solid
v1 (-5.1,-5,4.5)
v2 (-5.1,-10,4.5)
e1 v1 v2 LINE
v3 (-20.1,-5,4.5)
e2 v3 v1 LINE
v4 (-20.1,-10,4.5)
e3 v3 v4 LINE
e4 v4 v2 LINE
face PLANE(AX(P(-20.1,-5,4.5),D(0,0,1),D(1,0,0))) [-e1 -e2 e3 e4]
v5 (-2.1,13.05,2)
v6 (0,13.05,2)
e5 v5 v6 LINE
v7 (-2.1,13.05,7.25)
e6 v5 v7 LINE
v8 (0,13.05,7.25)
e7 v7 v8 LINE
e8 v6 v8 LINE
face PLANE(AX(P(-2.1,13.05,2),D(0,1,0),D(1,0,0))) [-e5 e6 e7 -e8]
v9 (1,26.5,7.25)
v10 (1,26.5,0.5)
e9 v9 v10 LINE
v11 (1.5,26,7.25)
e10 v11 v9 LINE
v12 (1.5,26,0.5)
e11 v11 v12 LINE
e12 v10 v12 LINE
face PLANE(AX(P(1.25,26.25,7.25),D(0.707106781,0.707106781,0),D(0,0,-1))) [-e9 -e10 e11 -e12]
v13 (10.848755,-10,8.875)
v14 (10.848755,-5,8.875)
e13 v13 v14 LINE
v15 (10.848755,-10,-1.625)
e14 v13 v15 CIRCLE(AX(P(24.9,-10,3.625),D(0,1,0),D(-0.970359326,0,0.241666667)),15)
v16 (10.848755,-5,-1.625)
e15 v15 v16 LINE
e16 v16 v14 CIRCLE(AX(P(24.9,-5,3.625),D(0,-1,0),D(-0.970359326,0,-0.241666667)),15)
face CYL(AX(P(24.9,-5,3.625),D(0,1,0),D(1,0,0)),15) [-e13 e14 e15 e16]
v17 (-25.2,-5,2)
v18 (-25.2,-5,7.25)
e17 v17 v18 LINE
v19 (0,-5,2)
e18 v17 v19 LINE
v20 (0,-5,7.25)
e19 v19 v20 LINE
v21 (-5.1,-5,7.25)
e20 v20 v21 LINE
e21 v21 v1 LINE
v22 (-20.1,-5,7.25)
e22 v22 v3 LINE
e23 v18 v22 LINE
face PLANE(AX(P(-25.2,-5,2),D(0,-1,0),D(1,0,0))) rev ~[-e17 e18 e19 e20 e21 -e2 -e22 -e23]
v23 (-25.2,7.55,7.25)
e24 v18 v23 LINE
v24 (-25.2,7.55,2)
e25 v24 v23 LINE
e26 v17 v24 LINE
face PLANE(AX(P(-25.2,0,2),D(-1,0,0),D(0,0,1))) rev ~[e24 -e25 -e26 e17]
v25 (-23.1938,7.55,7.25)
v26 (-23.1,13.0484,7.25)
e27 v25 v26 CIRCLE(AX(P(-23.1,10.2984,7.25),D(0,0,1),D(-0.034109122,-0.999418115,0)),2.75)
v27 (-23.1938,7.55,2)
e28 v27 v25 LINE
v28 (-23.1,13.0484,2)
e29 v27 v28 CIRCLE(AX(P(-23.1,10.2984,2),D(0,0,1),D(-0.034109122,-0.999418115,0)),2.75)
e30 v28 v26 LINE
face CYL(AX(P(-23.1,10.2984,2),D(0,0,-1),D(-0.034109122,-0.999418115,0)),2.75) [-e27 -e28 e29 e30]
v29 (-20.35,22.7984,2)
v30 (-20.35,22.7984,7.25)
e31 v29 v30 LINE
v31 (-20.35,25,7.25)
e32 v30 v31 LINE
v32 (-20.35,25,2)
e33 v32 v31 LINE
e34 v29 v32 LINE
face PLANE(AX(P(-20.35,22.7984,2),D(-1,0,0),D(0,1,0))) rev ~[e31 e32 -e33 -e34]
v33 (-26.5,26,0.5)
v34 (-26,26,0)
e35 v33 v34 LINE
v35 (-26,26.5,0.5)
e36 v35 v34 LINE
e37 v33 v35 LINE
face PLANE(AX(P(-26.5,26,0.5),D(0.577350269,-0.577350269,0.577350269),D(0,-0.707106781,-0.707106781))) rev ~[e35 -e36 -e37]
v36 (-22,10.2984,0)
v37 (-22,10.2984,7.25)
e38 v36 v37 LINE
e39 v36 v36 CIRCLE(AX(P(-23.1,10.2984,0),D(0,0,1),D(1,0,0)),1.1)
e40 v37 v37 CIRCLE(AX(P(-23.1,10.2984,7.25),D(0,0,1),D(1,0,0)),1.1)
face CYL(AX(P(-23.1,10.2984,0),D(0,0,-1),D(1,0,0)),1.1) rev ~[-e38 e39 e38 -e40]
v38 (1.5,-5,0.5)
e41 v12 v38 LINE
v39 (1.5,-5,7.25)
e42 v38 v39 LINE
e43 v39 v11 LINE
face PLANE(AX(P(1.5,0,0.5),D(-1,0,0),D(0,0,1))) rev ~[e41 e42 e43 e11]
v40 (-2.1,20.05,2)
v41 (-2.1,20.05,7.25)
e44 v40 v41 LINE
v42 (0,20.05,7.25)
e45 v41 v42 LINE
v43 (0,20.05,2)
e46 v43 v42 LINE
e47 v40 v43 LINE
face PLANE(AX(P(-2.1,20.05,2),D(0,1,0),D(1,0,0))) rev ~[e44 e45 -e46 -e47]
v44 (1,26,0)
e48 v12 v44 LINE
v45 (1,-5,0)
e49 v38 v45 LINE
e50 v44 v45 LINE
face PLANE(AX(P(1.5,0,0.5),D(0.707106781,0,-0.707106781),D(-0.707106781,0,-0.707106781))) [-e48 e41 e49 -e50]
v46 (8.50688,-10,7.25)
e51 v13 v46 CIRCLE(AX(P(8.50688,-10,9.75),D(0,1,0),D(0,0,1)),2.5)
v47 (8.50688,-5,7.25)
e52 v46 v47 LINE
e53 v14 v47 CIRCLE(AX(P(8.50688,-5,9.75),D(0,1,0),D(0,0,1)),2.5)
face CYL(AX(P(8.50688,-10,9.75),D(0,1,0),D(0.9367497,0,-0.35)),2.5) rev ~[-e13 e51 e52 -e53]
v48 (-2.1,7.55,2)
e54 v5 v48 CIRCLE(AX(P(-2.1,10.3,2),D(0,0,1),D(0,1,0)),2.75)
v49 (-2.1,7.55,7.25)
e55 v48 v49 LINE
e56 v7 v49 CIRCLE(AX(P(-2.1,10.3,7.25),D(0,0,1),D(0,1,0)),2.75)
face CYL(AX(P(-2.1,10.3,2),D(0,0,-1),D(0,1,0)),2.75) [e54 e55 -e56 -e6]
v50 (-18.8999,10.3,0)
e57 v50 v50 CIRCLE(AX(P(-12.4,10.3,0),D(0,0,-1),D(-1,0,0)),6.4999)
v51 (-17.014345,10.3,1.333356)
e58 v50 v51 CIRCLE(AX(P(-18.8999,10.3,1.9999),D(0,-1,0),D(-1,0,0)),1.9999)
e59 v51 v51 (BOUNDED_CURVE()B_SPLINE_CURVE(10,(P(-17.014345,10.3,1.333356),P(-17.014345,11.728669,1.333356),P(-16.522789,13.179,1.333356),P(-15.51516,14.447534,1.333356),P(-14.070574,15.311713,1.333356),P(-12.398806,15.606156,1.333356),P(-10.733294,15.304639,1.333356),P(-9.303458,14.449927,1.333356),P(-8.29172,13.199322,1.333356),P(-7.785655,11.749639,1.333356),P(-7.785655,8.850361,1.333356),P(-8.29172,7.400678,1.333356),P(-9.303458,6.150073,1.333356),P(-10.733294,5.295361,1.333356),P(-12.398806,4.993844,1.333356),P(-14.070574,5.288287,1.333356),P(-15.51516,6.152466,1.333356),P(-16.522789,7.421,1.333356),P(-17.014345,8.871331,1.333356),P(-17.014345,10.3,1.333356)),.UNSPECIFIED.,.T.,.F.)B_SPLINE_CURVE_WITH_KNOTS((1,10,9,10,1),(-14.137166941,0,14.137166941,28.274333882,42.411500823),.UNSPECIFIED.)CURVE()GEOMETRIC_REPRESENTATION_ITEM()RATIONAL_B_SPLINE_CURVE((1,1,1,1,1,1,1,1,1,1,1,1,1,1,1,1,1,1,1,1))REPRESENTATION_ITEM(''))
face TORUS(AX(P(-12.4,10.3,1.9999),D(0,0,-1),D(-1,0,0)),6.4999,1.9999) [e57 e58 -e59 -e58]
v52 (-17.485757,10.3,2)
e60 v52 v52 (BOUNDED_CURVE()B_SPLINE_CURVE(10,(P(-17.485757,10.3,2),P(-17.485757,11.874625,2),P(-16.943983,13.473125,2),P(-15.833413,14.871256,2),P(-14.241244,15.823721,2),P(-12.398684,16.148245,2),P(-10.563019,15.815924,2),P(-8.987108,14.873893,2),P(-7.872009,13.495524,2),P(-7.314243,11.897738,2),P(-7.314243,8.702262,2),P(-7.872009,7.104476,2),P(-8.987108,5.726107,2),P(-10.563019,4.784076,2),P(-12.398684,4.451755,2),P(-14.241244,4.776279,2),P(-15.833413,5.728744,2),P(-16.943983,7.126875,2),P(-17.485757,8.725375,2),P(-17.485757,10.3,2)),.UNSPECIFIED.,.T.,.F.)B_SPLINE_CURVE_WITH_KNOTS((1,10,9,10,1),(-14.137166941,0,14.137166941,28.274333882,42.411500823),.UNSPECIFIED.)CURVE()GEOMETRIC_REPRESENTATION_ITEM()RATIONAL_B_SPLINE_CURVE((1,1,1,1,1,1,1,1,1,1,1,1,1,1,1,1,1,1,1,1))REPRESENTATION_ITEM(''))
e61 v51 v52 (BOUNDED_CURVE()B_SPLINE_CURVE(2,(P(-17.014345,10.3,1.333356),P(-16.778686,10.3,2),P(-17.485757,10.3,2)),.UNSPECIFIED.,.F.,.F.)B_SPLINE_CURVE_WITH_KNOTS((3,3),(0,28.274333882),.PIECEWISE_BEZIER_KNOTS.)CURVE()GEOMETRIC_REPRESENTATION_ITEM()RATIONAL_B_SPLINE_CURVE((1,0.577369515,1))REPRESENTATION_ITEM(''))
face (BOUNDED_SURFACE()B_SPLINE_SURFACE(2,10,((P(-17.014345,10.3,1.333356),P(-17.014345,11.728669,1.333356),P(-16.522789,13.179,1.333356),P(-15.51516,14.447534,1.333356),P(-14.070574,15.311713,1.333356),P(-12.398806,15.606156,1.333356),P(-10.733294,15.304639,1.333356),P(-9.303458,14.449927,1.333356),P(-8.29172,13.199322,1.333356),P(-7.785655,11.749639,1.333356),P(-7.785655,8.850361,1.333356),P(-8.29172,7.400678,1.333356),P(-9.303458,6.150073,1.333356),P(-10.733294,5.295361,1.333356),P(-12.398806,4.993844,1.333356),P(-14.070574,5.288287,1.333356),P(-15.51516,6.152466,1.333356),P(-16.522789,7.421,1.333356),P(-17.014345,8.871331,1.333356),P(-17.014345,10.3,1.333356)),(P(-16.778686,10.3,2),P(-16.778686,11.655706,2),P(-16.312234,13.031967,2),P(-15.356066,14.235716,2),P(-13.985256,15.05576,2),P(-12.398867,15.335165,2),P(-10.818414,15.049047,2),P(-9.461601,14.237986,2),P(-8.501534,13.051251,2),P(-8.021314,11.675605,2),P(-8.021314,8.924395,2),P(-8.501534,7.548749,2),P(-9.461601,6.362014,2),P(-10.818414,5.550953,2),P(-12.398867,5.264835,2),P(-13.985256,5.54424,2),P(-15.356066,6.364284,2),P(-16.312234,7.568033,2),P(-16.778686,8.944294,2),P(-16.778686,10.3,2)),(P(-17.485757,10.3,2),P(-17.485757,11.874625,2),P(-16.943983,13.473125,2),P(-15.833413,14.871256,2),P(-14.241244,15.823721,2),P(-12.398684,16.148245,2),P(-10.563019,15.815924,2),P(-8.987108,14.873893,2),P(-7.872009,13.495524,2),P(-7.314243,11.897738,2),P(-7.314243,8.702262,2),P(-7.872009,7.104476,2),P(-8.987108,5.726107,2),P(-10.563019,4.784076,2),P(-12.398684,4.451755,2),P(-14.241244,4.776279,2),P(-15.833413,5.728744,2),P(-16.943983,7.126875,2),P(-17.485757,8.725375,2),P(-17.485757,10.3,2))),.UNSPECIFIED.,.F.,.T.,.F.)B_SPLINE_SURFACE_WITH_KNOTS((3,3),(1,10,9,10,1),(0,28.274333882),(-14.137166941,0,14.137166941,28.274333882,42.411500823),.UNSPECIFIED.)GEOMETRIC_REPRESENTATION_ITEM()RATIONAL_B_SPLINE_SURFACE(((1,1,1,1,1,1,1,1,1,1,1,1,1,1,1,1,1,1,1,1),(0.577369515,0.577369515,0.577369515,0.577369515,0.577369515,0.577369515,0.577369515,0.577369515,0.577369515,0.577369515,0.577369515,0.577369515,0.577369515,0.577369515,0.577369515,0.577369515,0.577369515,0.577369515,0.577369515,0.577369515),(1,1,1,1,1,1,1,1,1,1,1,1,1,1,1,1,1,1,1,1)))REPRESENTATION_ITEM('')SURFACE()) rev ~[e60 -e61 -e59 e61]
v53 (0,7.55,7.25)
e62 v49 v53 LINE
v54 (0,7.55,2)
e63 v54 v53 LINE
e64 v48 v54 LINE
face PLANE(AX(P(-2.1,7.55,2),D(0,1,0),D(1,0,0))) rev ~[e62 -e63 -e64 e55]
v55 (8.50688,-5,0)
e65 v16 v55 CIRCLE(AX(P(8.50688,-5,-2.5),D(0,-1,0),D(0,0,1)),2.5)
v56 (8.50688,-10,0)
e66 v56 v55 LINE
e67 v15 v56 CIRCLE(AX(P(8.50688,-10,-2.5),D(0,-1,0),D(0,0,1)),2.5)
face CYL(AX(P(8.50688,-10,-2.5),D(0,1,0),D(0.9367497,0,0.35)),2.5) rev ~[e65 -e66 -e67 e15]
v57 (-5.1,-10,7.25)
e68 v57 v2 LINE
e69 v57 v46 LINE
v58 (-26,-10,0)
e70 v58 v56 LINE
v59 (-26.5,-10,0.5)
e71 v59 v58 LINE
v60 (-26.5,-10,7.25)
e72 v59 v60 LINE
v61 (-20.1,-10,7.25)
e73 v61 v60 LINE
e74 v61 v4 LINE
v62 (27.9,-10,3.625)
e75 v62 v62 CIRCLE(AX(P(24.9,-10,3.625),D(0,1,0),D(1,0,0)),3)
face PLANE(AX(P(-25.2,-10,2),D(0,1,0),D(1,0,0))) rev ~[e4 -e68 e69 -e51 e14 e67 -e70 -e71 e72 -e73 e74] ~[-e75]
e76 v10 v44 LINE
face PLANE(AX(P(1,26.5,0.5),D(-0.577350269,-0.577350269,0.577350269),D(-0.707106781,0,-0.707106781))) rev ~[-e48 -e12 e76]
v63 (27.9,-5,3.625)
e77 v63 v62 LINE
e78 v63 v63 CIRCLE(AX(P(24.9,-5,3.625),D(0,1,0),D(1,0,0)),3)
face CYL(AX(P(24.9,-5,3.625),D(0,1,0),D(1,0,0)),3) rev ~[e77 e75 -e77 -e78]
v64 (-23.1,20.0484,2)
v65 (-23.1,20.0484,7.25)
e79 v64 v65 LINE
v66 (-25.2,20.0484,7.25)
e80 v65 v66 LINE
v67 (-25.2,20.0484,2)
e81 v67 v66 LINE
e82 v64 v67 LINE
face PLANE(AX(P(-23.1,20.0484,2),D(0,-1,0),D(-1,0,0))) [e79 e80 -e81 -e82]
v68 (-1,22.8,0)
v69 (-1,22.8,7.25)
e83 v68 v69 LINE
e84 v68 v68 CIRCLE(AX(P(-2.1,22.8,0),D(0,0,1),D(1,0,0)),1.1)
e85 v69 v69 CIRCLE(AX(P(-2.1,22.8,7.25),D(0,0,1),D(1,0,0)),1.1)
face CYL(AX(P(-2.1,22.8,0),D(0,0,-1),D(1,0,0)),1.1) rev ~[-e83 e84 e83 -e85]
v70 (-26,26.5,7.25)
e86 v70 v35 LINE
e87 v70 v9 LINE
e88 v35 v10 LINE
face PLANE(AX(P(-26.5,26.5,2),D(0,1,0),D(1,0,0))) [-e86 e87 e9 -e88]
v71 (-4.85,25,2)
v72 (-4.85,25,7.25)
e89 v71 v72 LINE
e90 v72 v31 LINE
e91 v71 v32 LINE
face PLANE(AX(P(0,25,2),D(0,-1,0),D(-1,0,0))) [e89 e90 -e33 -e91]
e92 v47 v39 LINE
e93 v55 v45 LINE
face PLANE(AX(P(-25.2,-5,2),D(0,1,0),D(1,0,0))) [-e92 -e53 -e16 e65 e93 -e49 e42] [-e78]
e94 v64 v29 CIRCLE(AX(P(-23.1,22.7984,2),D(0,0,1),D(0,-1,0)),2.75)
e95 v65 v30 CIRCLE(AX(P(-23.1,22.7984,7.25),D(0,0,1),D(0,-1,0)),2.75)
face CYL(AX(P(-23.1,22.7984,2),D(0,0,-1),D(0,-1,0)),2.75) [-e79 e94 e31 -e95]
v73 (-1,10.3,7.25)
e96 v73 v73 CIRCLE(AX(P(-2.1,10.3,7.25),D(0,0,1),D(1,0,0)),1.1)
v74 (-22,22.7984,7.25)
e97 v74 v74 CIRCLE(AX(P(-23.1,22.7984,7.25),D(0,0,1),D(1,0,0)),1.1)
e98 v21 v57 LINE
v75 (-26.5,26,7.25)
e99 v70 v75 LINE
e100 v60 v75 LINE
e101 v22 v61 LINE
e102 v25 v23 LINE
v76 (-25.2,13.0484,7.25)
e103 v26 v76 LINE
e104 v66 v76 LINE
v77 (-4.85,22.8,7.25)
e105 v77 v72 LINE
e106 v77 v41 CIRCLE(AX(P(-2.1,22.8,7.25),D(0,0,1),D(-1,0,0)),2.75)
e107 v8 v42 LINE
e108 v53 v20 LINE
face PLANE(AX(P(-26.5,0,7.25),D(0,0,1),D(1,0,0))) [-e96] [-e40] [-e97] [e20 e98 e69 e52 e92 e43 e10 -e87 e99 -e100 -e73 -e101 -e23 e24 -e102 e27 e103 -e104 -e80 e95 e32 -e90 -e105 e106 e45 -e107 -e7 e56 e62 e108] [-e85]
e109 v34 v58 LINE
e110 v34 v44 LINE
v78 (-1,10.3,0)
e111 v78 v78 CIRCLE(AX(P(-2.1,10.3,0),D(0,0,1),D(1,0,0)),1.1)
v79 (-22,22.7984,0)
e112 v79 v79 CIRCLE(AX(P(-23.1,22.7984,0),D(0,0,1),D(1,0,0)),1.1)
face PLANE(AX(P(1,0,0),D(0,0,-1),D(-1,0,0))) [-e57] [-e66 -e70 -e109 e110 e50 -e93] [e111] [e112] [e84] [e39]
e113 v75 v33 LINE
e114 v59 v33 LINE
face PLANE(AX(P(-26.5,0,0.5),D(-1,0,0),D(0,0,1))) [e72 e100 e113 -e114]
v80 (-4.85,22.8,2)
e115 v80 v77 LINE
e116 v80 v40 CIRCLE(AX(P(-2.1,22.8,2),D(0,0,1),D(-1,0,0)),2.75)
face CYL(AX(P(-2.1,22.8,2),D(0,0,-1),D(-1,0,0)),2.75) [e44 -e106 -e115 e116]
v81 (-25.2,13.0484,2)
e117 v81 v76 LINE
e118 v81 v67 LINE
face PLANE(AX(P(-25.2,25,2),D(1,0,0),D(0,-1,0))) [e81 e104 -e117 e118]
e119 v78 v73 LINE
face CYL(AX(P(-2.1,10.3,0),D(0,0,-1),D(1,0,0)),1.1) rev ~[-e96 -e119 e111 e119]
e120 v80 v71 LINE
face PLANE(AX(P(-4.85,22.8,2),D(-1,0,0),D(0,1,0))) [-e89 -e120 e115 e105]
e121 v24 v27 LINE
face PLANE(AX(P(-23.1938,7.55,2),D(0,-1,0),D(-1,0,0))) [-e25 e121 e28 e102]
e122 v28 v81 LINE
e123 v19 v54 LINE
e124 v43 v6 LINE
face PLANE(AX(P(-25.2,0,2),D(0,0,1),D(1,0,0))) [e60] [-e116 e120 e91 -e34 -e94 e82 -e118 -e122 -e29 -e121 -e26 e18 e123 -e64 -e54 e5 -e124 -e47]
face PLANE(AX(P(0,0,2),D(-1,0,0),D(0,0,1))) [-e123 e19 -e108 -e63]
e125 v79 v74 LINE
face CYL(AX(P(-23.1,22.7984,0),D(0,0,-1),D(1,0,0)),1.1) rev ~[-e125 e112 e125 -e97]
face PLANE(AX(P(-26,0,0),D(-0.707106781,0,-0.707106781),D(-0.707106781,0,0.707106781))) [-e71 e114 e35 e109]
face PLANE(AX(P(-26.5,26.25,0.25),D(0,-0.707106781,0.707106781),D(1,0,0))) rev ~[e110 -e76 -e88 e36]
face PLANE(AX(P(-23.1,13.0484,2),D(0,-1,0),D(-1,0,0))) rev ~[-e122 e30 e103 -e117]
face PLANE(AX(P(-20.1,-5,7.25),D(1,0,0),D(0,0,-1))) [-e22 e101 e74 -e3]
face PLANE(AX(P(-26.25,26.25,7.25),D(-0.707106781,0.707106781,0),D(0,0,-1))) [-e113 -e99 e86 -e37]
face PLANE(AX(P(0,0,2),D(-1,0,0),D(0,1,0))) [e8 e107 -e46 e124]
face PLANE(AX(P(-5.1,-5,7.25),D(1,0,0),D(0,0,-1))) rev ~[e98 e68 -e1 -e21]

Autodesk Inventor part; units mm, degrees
ref_plane "YZ Plane" through (0, 0, 0) normal (1, 0, 0) x (0, 1, 0)
ref_plane "XZ Plane" through (0, 0, 0) normal (0, 1, 0) x (-1, 0, 0)
ref_plane "XY Plane" through (0, 0, 0) normal (0, 0, 1) x (1, 0, 0)
sketch "Sketch1" plane through (0, 0, 0) normal (0, 0, 1) x (1, 0, 0)
  line L0 (0, 0) -> (-25, 0)
  line L1 (-25, 25) -> (0, 25)
  line L2 (0, 25) -> (0, 0)
  circle A0 centre (-23.1, 22.7984) radius 1.1
  circle A1 centre (-2.1, 22.8) radius 1.1
  circle A2 centre (-23.1, 10.2984) radius 1.1
  circle A3 centre (-2.1, 10.3) radius 1.1
  line L3 (-25, 0) -> (-25.2, 0)
  line L4 (-25.2, 0) -> (-25.2, 25)
  line L5 (-25.2, 25) -> (-25, 25)
  dimension "d2" = 2.2
  dimension "d5" = 2.2
  dimension "d7" = 12.5
  dimension "d8" = 2.2
  dimension "d9" = 2.2
  dimension "d14" = 12.5
  dimension "d31" = 2.1
  dimension "d46" = 0.2
  dimension "d47" = 2.1
  dimension "d48" = 2.1
extrude "Base" add sketch "Sketch1" along normal blind 2
sketch "Sketch2" plane through (0, 0, 2) normal (0, 0, 1) x (1, 0, 0)
  line L0 (-26.5, 0) -> (-26.5, 26.5)
  line L1 (-26.5, 26.5) -> (1.5, 26.5)
  line L2 (1.5, 26.5) -> (1.5, 0)
  line L3 (1.5, 0) -> (0, 0)
  line L4 (0, 25) -> (-25.2, 25) projected
  line L5 (0, 0) -> (0, 25) projected
  line L6 (-25.2, 25) -> (-25.2, 0) projected
  line L7 (-25.2, 0) -> (-26.5, 0)
  point P0 (-25, 25)
  point P1 (-25, 0)
  dimension "d16" = 26.5
  dimension "d17" = 28
extrude "Walls" add sketch "Sketch2" along normal blind 5.25 and the other way blind 2
sketch "Sketch3" plane through (0, 0, 2) normal (0, 0, 1) x (1, 0, 0)
  circle A0 centre (-23.1, 10.2984) radius 1.1 projected
  circle A1 centre (-23.1, 10.2984) radius 1.6
  circle A2 centre (-2.1, 10.3) radius 1.1 projected
  circle A3 centre (-2.1, 10.3) radius 1.6
  circle A4 centre (-23.1, 22.7984) radius 1.1 projected
  circle A5 centre (-23.1, 22.7984) radius 1.6
  circle A6 centre (-2.1, 22.8) radius 1.1 projected
  circle A7 centre (-2.1, 22.8) radius 1.6
  point P0 (0, 0)
  dimension "d22" = 3.2
  dimension "d23" = 3.2
  dimension "d24" = 3.2
  dimension "d25" = 3.2
extrude "Spacers" add sketch "Sketch3" along normal up to surface (5.25 mm away)
sketch "Sketch4" plane through (0, 0, 2) normal (0, 0, 1) x (1, 0, 0)
  circle A0 centre (-23.1, 10.2984) radius 1.1 projected
  arc A1 (-23.1938, 7.55) -> (-23.1, 13.0484) centre (-23.1, 10.2984) ccw
  circle A2 centre (-2.1, 10.3) radius 1.1 projected
  arc A3 (-2.1, 13.05) -> (-2.1, 7.55) centre (-2.1, 10.3) ccw
  circle A4 centre (-23.1, 22.7984) radius 1.1 projected
  circle A5 centre (-2.1, 22.8) radius 1.1 projected
  line L0 (-4.85, 22.8) -> (-4.85, 25)
  line L1 (-25.2, 25) -> (0, 25) projected
  line L2 (-2.1, 20.05) -> (0, 20.05)
  line L3 (0, 25) -> (0, 0) projected
  line L4 (-2.1, 13.05) -> (0, 13.05)
  line L5 (-2.1, 7.55) -> (0, 7.55)
  line L6 (-23.1, 13.0484) -> (-25.2, 13.0484)
  line L7 (-23.1938, 7.55) -> (-25, 7.55)
  arc A6 (-4.85, 22.8) -> (-2.1, 20.05) centre (-2.1, 22.8) ccw
  line L8 (-25, 7.55) -> (-25.2, 7.55)
  line L9 (-25.2, 13.0484) -> (-25.2, 13.0484)
  line L10 (-25.2, 25) -> (-25.2, 0) projected
  line L11 (-25.2, 20.0484) -> (-25.2, 20.0484)
  line L12 (-20.35, 22.7984) -> (-20.35, 25.6874)
  line L13 (-23.1, 20.0484) -> (-25.85, 20.0484)
  arc A7 (-23.1, 20.0484) -> (-20.35, 22.7984) centre (-23.1, 22.7984) ccw
  point P0 (-25, 25)
  point P1 (-20.35, 25)
  point P2 (-25.2, 20.0484)
  dimension "d33" = 5.5
  dimension "d34" = 5.5
extrude "Spacer blocks" add sketch "Sketch4" along normal up to surface (5.25 mm away)
sketch "Sketch5" plane through (0, 0, 0) normal (0, 0, -1) x (-1, 0, 0)
  line L0 (-1.5, 26.5) -> (-1.5, 0) projected
  circle A0 centre (12.4, 10.3) radius 4.5
  point P0 (0, 0)
  dimension "d39" = 13.9
  dimension "d40" = 9
extrude "Camera Hole" cut sketch "Sketch5" against normal through all
fillet "Outside Fillet - 2mm" radius 2 1 edges at (-7.9, 10.3, 0)
fillet "Inside Fillet - 1mm" radius 0.5 2 edges at (-7.9, 10.3, 1.9999) (-7.9, 10.3, 2)
chamfer "Chamfer1" distance 0.5 angle 45 5 edges at (1.5, 13.25, 0) (1.5, 26.5, 3.625) (-12.5, 26.5, 0) (-26.5, 26.5, 3.625) (-26.5, 13.25, 0)
sketch "Sketch6" plane through (-25.2, 0, 2) normal (0, -1, 0) x (1, 0, 0)
  line L0 (-0.8, -2) -> (-1.3, -1.5) projected
  line L1 (26.2, -2) -> (-0.8, -2) projected
  line L2 (26.7, -1.5) -> (26.2, -2) projected
  line L3 (26.7, -1.5) -> (26.7, 5.25) projected
  line L4 (25.2, 5.25) -> (26.7, 5.25) projected
  line L5 (25.2, 0) -> (25.2, 5.25) projected
  line L6 (0, 0) -> (25.2, 0) projected
  line L7 (0, 0) -> (0, 5.25) projected
  line L8 (-1.3, 5.25) -> (0, 5.25) projected
  line L9 (-1.3, -1.5) -> (-1.3, 5.25) projected
  point P0 (25.2, -2)
extrude "Bottom Extension" add sketch "Sketch6" along normal blind 5
sketch "Sketch7" plane through (-25.2, -5, 2) normal (0, -1, 0) x (1, 0, 0)
  line L0 (26.7, 5.25) -> (25.2, 5.25) projected
  line L1 (26.7, 5.25) -> (20.1, 5.25)
  line L2 (20.1, 5.25) -> (20.1, -2)
  line L3 (20.1, -2) -> (50.1, -2)
  line L4 (50.1, -2) -> (50.1, 5.25)
  line L5 (50.1, 5.25) -> (26.7, 5.25)
  line L6 (26.7, 5.25) -> (25.2, 5.25) construction
  line L7 (25.2, 5.25) -> (25.2, 0) construction
  line L8 (25.2, 0) -> (0, 0) construction
  line L9 (0, 0) -> (0, 5.25) construction
  line L10 (0, 5.25) -> (-1.3, 5.25) construction
  line L11 (-1.3, 5.25) -> (-1.3, -1.5) construction
  line L12 (-1.3, -1.5) -> (-0.8, -2) construction
  line L13 (-0.8, -2) -> (26.2, -2) construction
  line L14 (26.2, -2) -> (26.7, -1.5) construction
  line L15 (26.7, -1.5) -> (26.7, 5.25) construction
  line L16 (20.1, -2) -> (-0.8, -2)
  line L17 (-1.3, -1.5) -> (-0.8, -2)
  line L18 (-1.3, -1.5) -> (-1.3, 5.25)
  line L19 (-1.3, 5.25) -> (0, 5.25)
  line L20 (0, 5.25) -> (5.1, 5.25)
  line L21 (5.1, 5.25) -> (5.1, 0)
  line L22 (5.1, 0) -> (20.1, 0)
  line L23 (5.1, 0) -> (5.1, 2.5)
  line L24 (5.1, 2.5) -> (20.1, 2.5)
  point P0 (25.2, -2)
  dimension "d54" = 6.6
  dimension "d55" = 30
  dimension "d58" = 5.1
  dimension "d59" = 2.5
extrude "Mounting Arm" add sketch "Sketch7" along normal blind 5
sketch "Sketch8" plane through (-25.2, -5, 2) normal (0, 1, 0) x (1, 0, 0)
  line L0 (50.1, 2) -> (50.1, -5.25) projected
  circle A0 centre (50.1, -1.625) radius 15
  point P0 (25.2, 2)
  dimension "d60" = 30
extrude "Mounting Disk" add sketch "Sketch8" against normal up to surface (5 mm away)
fillet "Fillet4" radius 2.5 2 edges at (10.3446, -7.5, 0) (10.3446, -7.5, 7.25)
sketch "Sketch9" plane through (-25.2, -5, 2) normal (0, 1, 0) x (1, 0, 0)
  arc A0 (36.0488, -6.875) -> (36.0488, 3.625) centre (50.1, -1.625) ccw projected
  circle A1 centre (50.1, -1.625) radius 3
  point P0 (25.2, 2)
  dimension "d64" = 6
extrude "Center Hole" cut sketch "Sketch9" against normal through all
properties part number "Top L"
